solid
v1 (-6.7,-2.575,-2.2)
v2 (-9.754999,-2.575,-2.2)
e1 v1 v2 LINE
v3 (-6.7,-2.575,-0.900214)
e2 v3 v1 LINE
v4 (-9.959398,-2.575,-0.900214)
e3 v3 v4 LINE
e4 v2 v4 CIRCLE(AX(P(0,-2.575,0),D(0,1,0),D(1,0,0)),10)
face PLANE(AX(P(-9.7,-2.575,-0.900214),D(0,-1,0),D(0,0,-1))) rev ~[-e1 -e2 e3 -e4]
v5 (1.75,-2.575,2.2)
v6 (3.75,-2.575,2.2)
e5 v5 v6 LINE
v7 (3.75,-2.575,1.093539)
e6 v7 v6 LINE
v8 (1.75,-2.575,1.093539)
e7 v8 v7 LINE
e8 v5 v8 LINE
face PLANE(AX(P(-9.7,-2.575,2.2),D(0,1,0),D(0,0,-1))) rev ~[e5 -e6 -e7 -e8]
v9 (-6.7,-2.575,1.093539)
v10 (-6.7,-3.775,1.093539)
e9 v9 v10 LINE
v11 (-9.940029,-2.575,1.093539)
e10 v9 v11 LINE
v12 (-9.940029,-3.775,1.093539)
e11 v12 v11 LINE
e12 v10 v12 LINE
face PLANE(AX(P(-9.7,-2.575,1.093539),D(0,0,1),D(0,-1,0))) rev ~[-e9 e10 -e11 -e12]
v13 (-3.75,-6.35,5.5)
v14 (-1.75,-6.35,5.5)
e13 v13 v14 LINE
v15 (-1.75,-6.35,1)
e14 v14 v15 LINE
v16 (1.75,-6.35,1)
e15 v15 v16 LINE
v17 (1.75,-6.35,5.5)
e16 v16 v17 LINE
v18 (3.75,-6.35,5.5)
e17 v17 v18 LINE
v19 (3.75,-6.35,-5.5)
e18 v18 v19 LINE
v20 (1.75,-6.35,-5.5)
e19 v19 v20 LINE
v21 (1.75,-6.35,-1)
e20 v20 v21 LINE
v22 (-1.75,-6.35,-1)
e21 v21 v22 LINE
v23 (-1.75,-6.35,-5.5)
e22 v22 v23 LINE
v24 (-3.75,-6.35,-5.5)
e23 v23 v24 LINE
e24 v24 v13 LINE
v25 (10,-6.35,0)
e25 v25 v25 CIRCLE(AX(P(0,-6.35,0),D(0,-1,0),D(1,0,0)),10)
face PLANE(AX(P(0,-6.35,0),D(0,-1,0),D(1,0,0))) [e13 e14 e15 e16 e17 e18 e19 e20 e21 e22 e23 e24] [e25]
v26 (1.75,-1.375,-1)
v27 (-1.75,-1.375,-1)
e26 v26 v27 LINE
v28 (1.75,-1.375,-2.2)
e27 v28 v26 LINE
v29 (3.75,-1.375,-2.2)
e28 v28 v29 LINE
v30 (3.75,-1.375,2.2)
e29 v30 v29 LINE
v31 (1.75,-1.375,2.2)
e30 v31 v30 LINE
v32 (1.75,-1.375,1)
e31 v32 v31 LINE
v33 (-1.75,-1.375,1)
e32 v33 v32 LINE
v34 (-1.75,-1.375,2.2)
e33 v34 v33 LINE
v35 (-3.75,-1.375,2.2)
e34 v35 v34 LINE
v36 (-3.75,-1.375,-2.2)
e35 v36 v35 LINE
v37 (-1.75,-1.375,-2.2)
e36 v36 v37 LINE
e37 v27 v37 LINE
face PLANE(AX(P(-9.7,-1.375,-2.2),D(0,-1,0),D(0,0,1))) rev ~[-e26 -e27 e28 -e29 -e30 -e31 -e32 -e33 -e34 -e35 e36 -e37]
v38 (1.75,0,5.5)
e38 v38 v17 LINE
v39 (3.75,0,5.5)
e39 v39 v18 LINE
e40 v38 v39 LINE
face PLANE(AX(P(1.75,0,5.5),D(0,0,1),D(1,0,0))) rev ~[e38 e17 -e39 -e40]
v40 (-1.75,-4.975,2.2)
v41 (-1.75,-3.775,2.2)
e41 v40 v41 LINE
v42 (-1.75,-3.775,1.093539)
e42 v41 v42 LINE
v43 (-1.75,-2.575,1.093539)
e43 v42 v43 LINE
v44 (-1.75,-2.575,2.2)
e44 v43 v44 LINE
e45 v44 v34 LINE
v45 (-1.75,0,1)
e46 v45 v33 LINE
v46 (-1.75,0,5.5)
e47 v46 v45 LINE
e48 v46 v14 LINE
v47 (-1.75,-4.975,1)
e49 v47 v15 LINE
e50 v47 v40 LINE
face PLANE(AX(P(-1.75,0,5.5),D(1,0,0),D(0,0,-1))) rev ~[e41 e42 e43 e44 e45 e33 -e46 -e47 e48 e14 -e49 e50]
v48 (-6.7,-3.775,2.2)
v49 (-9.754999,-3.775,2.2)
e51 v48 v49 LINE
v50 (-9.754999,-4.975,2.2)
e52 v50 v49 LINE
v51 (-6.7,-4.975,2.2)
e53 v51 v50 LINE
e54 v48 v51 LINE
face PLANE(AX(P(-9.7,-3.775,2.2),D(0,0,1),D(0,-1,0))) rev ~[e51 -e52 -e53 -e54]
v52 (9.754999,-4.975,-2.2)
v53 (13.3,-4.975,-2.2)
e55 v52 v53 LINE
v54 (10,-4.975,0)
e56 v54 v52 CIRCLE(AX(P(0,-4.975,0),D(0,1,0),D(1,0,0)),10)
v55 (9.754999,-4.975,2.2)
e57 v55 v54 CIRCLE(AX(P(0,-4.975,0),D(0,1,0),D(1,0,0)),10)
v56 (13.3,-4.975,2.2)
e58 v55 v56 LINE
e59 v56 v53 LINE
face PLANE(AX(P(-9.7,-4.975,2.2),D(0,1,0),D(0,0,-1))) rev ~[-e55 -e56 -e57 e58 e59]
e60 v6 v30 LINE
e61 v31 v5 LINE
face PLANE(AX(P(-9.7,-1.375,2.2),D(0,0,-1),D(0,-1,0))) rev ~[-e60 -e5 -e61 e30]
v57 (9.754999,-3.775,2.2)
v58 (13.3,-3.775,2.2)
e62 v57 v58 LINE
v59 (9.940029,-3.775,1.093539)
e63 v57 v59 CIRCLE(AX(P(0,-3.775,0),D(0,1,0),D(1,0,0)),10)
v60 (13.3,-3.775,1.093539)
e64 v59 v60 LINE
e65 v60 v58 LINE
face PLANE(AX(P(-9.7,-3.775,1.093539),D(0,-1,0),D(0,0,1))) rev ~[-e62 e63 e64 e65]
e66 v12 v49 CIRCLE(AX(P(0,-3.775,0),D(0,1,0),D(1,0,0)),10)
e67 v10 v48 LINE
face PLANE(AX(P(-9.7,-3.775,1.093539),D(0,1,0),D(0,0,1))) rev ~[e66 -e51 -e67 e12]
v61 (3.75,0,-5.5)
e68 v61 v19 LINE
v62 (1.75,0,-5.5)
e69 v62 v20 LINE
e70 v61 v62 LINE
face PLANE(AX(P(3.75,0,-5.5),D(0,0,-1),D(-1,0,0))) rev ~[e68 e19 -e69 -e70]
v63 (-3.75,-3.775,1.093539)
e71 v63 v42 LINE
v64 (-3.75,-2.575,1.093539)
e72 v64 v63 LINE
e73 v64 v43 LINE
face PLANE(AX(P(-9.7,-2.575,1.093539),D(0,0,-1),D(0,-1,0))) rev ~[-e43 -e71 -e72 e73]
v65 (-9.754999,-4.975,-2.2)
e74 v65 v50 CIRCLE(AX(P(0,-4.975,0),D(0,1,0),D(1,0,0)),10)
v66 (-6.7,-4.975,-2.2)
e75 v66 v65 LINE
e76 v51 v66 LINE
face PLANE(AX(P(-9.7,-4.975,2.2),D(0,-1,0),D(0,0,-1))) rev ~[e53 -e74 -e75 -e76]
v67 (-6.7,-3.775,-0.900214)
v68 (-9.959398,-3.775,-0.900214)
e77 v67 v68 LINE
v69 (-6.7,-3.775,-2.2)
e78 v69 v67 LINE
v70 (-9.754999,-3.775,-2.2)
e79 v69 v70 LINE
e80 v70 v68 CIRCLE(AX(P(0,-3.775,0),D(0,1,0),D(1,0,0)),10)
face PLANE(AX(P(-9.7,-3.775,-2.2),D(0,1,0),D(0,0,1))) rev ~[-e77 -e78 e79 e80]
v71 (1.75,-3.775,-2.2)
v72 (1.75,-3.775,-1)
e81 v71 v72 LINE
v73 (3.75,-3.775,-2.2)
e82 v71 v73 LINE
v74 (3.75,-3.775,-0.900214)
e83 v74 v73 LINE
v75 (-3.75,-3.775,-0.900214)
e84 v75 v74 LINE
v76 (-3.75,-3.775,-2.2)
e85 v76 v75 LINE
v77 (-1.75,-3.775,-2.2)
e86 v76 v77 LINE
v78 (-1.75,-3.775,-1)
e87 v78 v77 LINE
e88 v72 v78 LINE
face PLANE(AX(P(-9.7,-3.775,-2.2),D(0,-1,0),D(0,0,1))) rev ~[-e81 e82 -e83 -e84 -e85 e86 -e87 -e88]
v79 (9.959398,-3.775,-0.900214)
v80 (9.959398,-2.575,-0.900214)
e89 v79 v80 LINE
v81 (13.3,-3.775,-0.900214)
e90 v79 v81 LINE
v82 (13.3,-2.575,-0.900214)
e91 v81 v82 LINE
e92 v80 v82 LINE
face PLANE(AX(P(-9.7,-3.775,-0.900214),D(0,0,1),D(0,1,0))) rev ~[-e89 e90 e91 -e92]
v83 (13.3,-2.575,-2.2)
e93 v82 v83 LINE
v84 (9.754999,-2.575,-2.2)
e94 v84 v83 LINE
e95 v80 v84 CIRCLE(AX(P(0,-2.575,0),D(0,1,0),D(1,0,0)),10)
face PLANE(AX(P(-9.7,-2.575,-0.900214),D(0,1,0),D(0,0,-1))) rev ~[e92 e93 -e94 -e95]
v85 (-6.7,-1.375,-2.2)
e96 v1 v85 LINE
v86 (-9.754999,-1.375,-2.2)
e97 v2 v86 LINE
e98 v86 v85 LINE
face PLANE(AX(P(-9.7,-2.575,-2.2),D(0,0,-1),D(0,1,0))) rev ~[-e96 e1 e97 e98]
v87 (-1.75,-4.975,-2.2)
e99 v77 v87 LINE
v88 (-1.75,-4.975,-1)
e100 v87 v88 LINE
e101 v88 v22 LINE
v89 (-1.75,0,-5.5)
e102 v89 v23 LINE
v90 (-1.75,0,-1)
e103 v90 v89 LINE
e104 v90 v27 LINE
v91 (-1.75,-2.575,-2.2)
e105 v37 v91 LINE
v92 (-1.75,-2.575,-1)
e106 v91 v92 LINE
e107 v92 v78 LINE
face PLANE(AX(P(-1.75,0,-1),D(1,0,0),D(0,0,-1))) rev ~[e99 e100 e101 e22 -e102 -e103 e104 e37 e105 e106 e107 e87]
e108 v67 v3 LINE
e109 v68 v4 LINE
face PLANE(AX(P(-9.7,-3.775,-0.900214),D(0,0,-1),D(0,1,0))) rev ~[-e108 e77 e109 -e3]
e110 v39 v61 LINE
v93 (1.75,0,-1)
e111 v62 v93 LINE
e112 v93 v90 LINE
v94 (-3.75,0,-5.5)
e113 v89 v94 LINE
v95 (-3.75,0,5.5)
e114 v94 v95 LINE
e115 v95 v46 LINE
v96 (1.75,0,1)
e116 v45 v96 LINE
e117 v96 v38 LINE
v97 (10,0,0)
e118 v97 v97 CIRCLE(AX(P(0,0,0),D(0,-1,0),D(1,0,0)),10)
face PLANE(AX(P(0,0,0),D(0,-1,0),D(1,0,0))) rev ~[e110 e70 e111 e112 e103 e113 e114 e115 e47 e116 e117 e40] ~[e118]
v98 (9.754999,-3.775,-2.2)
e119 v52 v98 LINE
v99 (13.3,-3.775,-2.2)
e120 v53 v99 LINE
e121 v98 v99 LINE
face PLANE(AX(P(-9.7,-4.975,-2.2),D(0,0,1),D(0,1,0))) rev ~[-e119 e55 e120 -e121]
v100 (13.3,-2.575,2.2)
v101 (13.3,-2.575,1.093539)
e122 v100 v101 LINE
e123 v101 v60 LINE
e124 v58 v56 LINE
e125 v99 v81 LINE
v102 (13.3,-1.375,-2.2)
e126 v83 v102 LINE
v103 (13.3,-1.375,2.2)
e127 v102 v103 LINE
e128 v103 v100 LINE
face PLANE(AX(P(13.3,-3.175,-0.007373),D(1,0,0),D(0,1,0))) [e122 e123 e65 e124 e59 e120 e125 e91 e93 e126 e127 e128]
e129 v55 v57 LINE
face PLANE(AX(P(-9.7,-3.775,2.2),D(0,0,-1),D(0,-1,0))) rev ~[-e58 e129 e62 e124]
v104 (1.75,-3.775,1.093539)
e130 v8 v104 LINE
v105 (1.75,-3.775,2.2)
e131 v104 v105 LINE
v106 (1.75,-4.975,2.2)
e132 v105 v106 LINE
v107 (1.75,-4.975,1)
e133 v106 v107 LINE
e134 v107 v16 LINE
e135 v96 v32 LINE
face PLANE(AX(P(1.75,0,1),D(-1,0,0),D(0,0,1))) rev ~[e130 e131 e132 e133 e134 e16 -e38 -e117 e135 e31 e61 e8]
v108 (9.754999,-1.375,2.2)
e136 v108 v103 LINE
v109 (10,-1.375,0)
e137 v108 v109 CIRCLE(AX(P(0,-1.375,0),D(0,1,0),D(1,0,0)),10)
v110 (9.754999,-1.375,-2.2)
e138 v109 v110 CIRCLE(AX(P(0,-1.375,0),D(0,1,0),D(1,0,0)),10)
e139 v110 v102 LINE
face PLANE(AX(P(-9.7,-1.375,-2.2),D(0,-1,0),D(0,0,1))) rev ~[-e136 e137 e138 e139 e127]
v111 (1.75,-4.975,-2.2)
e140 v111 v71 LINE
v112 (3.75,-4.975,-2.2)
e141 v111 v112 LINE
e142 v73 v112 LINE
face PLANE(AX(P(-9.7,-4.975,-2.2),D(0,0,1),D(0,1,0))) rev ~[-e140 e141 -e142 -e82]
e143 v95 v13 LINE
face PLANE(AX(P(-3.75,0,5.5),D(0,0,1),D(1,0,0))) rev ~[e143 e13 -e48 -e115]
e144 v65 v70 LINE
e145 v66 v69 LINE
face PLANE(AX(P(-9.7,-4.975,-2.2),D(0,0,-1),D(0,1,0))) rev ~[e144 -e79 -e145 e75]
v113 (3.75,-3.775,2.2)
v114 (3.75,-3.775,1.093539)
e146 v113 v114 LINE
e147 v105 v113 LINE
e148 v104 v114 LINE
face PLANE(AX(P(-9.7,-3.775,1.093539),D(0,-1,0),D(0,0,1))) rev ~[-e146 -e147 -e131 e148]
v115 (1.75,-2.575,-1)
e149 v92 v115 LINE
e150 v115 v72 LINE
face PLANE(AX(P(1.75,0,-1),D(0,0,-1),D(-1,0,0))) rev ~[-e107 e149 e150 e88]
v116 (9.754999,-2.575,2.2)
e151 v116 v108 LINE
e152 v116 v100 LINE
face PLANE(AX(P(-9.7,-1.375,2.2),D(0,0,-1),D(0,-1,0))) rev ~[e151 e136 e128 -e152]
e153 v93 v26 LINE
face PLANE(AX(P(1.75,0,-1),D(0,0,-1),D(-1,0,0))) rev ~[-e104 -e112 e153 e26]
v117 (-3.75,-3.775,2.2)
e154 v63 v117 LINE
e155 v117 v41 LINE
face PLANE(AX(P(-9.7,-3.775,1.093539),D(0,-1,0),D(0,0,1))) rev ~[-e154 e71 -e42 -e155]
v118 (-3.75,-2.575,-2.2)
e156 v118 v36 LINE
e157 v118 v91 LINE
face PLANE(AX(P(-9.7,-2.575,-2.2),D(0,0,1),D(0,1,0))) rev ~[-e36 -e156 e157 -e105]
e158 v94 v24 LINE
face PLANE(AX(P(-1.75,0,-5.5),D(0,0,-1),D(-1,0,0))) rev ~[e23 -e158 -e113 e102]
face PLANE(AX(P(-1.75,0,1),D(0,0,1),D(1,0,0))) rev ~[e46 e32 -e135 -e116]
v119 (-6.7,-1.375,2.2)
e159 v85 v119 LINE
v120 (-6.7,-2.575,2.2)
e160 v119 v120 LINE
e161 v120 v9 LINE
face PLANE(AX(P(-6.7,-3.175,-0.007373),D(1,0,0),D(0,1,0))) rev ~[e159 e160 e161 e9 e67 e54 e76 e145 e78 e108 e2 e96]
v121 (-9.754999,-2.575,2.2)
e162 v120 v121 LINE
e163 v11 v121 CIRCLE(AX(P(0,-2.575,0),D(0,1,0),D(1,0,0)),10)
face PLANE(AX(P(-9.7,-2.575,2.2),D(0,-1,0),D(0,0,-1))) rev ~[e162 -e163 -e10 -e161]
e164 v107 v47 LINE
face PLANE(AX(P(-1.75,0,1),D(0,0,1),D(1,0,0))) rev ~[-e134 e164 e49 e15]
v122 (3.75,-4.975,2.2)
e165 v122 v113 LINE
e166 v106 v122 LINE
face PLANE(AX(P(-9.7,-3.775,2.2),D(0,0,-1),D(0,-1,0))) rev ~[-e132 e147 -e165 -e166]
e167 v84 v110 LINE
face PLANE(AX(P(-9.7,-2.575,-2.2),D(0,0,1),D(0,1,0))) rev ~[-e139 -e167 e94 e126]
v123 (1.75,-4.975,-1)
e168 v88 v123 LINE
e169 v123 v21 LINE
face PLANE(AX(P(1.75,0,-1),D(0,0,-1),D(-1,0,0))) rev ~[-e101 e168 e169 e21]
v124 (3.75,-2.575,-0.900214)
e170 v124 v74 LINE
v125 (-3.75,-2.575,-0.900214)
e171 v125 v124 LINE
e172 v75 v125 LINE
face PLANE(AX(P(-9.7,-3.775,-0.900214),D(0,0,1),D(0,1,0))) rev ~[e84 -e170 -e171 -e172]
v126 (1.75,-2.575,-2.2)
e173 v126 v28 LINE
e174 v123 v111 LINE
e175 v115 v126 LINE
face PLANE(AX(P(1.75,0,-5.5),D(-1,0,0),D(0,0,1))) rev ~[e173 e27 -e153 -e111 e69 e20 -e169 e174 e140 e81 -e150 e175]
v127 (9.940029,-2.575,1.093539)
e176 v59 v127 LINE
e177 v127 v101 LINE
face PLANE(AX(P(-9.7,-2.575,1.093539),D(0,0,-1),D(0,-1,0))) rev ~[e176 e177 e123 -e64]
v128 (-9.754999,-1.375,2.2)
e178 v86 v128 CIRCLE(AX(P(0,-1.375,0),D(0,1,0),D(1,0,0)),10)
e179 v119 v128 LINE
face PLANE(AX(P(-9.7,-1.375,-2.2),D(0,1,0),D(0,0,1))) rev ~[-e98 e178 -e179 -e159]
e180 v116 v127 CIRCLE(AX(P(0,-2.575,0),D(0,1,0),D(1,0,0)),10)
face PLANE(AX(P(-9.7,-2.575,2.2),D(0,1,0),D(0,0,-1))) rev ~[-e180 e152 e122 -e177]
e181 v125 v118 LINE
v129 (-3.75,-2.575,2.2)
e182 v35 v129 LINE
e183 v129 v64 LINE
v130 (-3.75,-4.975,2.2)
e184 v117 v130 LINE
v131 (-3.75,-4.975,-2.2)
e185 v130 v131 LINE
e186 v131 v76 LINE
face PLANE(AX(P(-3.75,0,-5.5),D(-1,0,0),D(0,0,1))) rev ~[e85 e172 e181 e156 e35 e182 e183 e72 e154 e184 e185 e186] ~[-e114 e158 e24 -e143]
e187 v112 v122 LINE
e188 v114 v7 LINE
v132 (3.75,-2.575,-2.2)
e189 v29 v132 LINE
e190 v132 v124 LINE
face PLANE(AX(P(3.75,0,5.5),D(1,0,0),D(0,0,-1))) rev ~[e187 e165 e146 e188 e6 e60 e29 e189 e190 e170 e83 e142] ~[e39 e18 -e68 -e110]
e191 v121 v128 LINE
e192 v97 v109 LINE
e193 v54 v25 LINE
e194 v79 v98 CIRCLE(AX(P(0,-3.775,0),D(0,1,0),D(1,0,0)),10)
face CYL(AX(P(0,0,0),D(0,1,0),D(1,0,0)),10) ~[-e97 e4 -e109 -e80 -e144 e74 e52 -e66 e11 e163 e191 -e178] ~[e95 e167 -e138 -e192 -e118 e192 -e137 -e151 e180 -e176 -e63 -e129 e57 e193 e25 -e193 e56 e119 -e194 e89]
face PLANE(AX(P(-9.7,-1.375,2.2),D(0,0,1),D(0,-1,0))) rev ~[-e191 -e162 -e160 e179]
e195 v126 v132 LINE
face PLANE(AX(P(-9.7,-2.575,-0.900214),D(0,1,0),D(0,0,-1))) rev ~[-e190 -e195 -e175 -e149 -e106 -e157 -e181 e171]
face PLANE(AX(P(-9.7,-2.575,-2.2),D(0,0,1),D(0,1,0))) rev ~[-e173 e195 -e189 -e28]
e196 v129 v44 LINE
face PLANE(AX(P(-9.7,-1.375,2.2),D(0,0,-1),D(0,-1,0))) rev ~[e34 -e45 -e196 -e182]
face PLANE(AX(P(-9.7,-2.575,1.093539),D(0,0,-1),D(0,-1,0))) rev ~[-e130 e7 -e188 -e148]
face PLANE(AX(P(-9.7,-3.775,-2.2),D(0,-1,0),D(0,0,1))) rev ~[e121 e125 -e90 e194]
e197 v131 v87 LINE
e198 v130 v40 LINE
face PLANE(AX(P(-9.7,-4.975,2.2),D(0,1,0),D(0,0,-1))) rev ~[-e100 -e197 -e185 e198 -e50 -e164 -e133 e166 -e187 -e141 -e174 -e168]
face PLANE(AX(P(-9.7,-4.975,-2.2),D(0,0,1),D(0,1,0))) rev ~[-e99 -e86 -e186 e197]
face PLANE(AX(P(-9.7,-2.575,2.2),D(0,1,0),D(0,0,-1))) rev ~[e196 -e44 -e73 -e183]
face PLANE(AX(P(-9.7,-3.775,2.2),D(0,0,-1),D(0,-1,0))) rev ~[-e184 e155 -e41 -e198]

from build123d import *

# Parameters (mm, degrees)
F0_R     = 10
F1_DEPTH = 6.35
F4_DEPTH = 23
F5_DEPTH = 3
F6_DEPTH = 25


# Not quite as in the source:
# - a feature names something its author has since deleted; it is built from what else it names


with BuildPart() as f1:
    # F0 (on Front) → F1 (new body)
    with BuildSketch(Plane.XZ):
        Circle(F0_R)
        Polygon((-3.75, -5.5), (-3.75, -1), (-3.75, 1), (-3.75, 5.5), (-1.75, 5.5), (-1.75, 1), (1.75, 1), (1.75, 5.5), (3.75, 5.5), (3.75, 1), (3.75, -1), (3.75, -5.5), (1.75, -5.5), (1.75, -1), (-1.75, -1), (-1.75, -5.5), align=None, mode=Mode.SUBTRACT)
    extrude(amount=F1_DEPTH)

    # F3 (on offset) → F4 (join)
    with BuildSketch(Plane.YZ.offset(-9.7)):
        Polygon((-1.375, -2.2), (-1.375, 0), (-1.375, 2.2), (-2.575, 2.2), (-2.575, 1.0935393064), (-3.775, 1.0935393064), (-3.775, 2.2), (-4.975, 2.2), (-4.975, -2.2), (-3.775, -2.2), (-3.775, -0.9002136735), (-2.575, -0.9002136735), (-2.575, -2.2), align=None)
    extrude(amount=F4_DEPTH)

    # F3 (on offset) → F5 (cut)
    with BuildSketch(Plane.YZ.offset(-9.7)):
        Polygon((-1.375, -2.2), (-1.375, 0), (-1.375, 2.2), (-2.575, 2.2), (-2.575, 1.0935393064), (-3.775, 1.0935393064), (-3.775, 2.2), (-4.975, 2.2), (-4.975, -2.2), (-3.775, -2.2), (-3.775, -0.9002136735), (-2.575, -0.9002136735), (-2.575, -2.2), align=None)
    extrude(amount=F5_DEPTH, mode=Mode.SUBTRACT)

    # F3 (on offset) → F6 (cut)
    with BuildSketch(Plane.YZ.offset(-9.7)):
        Polygon((-1.375, -2.2), (-1.375, 0), (-1.375, 2.2), (-2.575, 2.2), (-2.575, 1.0935393064), (-3.775, 1.0935393064), (-3.775, 2.2), (-4.975, 2.2), (-4.975, -2.2), (-3.775, -2.2), (-3.775, -0.9002136735), (-2.575, -0.9002136735), (-2.575, -2.2), align=None)
    extrude(amount=-F6_DEPTH, mode=Mode.SUBTRACT)


solid = f1.part
